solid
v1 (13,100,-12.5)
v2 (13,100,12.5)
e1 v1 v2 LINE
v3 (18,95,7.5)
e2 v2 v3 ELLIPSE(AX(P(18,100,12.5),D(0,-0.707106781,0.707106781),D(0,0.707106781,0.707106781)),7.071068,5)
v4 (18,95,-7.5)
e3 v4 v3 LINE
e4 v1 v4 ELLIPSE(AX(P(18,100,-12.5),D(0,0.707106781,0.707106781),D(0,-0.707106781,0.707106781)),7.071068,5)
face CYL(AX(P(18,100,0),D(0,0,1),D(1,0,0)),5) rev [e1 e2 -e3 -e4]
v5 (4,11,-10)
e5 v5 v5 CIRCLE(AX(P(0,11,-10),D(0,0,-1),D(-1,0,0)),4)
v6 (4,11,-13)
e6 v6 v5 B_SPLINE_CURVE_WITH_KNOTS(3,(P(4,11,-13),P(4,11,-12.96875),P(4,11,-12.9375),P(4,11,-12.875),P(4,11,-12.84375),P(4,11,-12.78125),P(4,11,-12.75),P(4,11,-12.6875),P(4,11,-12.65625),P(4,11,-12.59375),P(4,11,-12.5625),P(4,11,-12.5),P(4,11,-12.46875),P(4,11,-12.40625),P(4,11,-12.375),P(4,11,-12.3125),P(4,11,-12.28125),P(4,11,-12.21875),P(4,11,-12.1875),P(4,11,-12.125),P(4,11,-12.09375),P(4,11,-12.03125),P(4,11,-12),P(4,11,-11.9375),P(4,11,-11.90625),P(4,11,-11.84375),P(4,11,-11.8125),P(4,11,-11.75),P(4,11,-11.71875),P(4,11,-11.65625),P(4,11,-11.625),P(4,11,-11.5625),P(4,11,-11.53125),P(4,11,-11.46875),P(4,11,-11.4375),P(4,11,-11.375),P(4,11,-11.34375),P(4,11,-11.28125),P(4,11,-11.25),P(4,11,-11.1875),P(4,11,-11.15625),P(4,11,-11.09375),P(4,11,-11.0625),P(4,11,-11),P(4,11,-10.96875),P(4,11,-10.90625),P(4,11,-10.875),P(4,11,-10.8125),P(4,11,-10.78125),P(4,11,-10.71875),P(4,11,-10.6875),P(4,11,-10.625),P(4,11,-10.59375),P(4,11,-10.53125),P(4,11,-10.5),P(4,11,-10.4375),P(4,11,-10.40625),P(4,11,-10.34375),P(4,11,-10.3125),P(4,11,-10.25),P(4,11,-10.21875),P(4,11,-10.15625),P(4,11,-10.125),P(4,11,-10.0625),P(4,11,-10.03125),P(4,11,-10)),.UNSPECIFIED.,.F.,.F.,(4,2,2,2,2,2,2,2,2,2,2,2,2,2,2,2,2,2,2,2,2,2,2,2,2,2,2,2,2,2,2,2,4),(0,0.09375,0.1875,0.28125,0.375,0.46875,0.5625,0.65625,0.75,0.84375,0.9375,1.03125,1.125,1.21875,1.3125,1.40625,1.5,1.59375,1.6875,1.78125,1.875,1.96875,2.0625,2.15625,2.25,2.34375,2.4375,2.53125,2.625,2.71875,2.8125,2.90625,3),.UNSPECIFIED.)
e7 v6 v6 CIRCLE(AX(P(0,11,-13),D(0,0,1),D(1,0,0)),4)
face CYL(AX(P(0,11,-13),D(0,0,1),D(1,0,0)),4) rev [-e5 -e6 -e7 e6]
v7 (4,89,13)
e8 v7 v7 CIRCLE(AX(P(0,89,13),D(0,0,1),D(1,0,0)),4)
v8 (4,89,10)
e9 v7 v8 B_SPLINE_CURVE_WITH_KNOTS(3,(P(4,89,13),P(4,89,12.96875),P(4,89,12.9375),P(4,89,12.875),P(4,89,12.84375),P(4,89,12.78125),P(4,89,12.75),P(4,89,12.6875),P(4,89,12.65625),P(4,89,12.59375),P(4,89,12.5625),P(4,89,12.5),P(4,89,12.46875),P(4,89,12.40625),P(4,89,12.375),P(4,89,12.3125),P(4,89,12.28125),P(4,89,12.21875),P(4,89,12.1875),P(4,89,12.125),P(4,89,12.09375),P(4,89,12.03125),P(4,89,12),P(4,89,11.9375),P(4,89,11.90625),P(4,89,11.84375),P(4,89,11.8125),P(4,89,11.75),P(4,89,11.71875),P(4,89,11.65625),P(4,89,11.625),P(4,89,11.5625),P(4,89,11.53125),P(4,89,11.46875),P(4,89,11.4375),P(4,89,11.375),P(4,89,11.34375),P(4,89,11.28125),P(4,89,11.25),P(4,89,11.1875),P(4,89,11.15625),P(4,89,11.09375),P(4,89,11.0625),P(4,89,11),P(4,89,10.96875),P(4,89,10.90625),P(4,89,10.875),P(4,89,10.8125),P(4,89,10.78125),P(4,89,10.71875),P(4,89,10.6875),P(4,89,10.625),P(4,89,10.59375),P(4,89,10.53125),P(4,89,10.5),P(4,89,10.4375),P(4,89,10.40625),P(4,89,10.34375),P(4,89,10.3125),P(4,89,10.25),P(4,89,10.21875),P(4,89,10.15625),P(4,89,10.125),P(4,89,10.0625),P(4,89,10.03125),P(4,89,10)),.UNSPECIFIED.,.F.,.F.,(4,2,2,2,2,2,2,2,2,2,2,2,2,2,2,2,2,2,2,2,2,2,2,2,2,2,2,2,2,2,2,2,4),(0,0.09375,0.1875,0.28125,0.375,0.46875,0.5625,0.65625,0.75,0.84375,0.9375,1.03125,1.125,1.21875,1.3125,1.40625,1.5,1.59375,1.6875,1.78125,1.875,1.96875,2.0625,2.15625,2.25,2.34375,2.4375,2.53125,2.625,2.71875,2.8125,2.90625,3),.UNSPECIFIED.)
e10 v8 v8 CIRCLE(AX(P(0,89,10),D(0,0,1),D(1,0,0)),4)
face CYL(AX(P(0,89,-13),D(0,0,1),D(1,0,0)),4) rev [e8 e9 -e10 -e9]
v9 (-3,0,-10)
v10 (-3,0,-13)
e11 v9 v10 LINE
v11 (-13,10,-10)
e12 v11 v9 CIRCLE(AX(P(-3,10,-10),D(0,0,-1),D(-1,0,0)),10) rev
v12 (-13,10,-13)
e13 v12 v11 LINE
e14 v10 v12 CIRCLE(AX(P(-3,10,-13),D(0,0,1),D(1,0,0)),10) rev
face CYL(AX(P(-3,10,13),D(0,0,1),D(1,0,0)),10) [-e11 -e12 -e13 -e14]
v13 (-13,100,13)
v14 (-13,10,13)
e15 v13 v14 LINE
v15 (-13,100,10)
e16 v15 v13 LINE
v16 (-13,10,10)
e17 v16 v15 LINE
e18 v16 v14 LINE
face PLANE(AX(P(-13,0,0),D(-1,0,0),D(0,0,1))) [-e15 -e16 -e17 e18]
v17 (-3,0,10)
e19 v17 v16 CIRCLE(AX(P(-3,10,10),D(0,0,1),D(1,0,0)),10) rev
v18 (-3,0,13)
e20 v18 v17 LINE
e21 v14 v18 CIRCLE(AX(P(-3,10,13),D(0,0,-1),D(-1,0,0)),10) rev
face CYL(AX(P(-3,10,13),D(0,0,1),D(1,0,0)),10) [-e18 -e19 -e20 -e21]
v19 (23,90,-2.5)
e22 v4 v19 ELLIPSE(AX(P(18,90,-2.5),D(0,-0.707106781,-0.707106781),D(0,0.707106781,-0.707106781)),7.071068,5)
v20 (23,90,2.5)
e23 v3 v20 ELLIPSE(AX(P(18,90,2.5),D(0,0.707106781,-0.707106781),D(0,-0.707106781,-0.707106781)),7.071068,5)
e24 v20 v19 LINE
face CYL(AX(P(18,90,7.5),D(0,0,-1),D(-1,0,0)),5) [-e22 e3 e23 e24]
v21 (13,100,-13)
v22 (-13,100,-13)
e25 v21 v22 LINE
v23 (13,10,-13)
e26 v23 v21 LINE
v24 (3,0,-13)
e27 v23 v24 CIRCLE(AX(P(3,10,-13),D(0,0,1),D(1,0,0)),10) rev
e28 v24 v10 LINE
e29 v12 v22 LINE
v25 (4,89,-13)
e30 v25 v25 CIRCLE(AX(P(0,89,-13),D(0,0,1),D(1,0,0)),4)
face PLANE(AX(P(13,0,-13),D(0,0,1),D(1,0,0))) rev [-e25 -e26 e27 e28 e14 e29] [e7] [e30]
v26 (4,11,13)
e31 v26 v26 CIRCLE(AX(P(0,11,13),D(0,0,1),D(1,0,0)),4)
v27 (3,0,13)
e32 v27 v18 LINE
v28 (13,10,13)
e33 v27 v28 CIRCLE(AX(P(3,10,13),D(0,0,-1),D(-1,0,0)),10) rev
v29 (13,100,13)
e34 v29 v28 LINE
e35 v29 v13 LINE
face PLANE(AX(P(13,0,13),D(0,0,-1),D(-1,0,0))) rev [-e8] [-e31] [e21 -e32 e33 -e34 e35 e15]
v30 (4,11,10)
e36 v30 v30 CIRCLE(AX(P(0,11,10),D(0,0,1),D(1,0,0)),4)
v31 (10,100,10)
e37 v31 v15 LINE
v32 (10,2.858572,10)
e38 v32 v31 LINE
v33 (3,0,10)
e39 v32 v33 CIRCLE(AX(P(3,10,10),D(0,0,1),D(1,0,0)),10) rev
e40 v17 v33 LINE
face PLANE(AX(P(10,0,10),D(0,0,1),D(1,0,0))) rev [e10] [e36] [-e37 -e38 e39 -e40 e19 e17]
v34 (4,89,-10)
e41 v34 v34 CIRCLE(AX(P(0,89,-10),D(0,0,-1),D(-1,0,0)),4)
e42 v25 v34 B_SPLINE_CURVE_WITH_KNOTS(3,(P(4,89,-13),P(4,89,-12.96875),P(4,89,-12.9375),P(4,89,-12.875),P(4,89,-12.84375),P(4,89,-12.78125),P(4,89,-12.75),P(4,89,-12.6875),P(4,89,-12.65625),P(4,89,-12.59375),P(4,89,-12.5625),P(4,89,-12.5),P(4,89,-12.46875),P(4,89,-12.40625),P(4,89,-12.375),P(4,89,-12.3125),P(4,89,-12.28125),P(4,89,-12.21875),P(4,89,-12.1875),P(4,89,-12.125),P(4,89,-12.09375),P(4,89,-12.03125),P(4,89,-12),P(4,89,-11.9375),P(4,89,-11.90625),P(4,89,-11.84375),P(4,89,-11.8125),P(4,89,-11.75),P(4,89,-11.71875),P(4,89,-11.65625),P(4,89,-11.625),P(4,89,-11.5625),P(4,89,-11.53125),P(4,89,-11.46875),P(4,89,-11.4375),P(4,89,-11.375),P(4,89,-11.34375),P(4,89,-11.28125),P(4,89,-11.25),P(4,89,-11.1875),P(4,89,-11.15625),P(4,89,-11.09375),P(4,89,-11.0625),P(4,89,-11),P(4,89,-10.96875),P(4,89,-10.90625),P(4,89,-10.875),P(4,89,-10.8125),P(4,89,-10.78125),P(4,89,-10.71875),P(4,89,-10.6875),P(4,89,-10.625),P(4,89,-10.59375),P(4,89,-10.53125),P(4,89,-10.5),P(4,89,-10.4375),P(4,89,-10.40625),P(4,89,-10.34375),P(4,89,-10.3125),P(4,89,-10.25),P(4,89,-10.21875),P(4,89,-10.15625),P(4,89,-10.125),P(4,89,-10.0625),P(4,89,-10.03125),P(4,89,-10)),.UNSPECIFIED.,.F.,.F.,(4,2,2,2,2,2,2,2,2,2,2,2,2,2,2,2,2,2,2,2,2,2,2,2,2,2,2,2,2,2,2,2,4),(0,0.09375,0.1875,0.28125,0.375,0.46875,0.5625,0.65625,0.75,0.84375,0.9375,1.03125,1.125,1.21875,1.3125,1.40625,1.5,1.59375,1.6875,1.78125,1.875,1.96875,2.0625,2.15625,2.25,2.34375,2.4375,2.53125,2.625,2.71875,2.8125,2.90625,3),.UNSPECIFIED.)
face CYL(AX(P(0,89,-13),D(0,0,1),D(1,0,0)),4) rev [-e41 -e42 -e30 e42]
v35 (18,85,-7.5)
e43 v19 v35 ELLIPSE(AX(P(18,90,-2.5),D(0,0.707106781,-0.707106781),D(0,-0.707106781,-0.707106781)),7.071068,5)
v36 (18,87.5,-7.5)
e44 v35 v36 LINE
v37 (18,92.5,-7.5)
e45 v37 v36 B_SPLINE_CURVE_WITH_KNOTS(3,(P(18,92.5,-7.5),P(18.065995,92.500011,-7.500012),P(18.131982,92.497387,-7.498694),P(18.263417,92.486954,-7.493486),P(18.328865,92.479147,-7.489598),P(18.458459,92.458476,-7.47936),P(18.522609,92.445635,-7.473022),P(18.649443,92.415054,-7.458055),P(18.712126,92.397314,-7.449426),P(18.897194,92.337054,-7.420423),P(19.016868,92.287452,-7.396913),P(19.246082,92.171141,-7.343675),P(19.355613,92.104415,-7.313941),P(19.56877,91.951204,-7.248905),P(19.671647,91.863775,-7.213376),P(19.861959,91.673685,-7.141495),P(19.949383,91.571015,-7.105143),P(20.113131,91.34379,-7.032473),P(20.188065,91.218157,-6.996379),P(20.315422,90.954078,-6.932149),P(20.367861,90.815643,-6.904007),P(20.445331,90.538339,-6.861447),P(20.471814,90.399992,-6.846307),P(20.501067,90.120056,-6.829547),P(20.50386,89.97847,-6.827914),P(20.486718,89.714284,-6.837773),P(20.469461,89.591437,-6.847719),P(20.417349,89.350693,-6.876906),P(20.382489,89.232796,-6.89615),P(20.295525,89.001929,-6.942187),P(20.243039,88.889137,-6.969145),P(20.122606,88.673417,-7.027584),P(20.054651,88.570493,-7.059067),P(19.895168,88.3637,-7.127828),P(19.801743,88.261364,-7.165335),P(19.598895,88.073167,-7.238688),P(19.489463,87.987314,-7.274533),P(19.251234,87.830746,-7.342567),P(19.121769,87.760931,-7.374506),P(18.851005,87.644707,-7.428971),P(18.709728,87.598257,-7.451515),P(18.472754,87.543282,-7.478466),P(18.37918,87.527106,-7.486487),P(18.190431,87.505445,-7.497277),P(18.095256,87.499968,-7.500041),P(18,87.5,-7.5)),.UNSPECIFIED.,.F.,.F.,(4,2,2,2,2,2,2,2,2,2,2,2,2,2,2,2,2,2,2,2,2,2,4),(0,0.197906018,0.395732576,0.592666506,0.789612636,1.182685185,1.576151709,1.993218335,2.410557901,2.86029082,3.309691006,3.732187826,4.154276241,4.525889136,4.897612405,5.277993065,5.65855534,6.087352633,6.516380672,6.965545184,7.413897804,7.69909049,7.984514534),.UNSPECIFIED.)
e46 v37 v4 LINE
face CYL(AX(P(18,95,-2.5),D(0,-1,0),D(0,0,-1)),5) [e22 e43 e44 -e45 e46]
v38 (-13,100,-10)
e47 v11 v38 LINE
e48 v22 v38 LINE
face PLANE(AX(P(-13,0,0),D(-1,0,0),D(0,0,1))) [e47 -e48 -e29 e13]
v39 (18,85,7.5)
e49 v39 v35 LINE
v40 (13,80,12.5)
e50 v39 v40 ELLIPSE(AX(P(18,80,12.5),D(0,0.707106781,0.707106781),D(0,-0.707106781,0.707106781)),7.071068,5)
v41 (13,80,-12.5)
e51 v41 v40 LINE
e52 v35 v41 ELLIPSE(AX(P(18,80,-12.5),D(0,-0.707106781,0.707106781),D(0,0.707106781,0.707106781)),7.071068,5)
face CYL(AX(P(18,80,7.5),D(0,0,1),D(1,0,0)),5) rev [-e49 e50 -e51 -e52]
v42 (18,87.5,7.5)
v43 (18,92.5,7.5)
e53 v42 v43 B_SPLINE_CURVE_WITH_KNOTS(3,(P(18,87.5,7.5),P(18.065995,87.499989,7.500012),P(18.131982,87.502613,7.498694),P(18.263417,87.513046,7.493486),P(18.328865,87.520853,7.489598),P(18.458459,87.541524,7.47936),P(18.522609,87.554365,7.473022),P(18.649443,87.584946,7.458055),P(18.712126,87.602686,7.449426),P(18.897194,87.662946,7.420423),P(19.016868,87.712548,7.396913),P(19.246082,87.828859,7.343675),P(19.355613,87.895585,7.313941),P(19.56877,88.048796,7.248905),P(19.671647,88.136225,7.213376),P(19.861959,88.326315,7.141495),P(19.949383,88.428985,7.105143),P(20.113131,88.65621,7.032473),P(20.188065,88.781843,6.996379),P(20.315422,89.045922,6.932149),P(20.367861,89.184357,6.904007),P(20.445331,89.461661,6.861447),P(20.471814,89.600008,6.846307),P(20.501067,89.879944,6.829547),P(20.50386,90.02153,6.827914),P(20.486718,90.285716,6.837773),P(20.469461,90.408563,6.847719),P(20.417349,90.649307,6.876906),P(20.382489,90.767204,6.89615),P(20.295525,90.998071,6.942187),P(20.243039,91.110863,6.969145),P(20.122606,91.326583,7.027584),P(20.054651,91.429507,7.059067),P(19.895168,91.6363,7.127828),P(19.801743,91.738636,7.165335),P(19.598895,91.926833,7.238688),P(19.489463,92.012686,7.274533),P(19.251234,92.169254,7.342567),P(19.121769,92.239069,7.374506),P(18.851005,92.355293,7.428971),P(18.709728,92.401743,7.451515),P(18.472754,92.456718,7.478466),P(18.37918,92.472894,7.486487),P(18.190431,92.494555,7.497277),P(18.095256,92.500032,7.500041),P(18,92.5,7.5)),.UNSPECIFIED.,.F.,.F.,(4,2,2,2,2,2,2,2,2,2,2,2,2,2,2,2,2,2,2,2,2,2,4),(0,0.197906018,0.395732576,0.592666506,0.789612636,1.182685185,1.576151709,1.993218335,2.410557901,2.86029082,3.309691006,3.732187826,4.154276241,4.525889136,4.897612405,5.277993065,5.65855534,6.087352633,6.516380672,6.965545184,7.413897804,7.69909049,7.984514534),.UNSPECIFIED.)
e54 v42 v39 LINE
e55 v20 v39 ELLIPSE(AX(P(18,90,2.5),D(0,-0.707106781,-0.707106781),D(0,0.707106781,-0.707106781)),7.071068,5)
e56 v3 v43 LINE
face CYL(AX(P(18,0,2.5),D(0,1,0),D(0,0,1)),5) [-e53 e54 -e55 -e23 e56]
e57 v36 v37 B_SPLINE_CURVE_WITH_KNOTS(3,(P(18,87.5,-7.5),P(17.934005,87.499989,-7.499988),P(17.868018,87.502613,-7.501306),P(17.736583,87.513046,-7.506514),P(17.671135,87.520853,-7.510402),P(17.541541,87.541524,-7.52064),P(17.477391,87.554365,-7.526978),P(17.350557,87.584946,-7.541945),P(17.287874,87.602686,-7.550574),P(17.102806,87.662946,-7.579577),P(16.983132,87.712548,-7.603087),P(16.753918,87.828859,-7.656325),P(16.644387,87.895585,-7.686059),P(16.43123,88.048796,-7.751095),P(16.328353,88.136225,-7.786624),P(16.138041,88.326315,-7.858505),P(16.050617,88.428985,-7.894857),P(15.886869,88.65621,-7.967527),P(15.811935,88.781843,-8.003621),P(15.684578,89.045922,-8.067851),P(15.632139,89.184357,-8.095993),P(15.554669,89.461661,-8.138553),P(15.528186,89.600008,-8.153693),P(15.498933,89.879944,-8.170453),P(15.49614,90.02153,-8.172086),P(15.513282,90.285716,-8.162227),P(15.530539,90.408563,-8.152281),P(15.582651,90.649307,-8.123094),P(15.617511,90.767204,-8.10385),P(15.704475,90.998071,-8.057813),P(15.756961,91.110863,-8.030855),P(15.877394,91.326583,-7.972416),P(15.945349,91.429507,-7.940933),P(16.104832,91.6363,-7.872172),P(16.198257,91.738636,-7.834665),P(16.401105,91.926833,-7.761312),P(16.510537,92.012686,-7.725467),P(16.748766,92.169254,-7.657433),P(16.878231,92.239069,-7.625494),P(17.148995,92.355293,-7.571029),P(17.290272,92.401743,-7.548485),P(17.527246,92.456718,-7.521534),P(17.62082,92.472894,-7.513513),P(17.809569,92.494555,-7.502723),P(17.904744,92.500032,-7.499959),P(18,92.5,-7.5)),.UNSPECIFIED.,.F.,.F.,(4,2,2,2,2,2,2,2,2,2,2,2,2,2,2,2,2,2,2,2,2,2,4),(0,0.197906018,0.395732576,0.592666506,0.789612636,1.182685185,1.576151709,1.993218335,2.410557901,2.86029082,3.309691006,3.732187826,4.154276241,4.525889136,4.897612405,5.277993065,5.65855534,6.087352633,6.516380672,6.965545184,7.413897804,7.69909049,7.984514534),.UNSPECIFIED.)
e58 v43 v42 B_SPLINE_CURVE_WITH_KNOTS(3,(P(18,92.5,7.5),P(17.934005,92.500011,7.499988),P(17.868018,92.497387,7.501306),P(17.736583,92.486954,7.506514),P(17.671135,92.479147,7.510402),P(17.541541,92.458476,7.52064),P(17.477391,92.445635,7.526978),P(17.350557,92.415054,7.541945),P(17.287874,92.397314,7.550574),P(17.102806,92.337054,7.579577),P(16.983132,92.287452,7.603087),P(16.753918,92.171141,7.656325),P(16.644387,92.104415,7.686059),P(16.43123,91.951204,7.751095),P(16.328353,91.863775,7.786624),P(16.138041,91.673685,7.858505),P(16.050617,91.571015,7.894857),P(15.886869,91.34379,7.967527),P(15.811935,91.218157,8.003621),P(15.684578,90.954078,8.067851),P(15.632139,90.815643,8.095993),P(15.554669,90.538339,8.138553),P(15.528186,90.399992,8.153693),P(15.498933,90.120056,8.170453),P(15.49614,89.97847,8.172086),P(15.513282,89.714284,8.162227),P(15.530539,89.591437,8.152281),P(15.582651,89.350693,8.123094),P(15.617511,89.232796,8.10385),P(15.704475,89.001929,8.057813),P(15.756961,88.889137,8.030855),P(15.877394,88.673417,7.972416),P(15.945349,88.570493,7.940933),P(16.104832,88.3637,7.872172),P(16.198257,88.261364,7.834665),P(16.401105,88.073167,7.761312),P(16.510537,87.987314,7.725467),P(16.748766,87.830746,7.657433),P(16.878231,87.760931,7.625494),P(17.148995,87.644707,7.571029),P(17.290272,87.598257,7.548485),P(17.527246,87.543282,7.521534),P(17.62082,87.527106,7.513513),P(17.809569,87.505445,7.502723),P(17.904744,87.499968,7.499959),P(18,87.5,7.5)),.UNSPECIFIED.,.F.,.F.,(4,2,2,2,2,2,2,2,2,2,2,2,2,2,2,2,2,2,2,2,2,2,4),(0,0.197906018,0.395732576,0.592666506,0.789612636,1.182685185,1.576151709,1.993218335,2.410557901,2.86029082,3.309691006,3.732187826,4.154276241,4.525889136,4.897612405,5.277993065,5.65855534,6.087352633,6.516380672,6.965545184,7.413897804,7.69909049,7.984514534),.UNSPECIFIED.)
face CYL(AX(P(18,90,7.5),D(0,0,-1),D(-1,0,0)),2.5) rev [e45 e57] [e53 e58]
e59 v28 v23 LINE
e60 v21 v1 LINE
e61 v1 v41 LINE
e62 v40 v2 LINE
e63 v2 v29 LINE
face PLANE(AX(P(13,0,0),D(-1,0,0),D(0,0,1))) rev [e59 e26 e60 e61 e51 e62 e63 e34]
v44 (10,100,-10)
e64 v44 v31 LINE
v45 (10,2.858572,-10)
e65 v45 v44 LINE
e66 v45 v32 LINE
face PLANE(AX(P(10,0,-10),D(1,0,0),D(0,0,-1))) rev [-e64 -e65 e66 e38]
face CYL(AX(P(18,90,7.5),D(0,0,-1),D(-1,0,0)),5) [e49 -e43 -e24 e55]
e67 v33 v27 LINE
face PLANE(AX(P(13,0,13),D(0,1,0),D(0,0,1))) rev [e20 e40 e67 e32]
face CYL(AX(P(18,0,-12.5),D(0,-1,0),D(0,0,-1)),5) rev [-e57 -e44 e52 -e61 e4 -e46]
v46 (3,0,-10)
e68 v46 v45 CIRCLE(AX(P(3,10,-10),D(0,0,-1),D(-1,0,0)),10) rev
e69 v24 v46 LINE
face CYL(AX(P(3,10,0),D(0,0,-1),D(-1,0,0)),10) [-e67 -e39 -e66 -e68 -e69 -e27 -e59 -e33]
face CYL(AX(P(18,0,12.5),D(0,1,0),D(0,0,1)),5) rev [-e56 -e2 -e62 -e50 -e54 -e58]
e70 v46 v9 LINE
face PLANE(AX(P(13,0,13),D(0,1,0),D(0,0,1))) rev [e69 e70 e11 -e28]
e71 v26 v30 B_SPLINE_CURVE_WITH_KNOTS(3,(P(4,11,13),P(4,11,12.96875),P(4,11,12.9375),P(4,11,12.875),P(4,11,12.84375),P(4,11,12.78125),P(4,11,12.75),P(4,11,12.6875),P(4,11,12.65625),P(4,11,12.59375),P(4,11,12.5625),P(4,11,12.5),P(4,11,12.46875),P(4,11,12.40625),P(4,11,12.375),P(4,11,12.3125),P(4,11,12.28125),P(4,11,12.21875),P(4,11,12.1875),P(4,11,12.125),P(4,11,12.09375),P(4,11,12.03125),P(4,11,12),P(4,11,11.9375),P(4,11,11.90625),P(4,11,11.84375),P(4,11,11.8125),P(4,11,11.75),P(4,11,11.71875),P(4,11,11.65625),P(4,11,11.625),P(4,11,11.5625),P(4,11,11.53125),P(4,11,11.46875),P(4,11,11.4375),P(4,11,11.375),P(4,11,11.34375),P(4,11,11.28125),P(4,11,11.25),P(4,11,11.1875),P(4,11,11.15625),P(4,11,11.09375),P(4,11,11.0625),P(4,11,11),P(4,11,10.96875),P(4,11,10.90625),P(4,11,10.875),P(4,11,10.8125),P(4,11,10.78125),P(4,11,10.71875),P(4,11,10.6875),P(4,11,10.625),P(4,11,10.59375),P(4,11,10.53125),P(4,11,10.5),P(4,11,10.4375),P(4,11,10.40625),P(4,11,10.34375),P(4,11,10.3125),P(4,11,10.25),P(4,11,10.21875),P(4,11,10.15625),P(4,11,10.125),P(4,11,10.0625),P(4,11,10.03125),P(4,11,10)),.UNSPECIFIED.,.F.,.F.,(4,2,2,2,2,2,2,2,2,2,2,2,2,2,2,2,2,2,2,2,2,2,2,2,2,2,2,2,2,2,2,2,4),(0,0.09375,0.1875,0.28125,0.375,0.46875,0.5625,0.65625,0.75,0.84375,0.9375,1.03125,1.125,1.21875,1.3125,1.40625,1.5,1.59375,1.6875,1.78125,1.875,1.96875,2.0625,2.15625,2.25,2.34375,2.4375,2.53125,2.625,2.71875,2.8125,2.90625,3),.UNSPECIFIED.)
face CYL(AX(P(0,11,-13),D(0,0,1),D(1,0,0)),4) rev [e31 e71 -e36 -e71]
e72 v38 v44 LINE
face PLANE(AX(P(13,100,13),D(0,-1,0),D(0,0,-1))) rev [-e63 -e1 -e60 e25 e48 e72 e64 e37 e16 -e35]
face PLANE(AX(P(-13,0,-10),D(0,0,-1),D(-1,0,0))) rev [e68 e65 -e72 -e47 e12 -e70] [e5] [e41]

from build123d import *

# Parameters (mm, degrees)
SKETCH1_W               = 26
SKETCH1_H               = 100
BOSS_EXTRUDE1_DEPTH     = 13
FILLET1_R               = 10
SKETCH5_W               = 10
SKETCH5_H               = 10
SKETCH5_R               = 2.5
BOSS_EXTRUDE3_DEPTH     = 7.5
FILLET2_R               = 5
CUT_EXTRUDE1_DEPTH      = 104.431136533
CUT_EXTRUDE1_DEPTH_BACK = 104.431136533
SKETCH6_W               = 23
SKETCH6_H               = 20
CUT_EXTRUDE2_DEPTH      = 104.43113663
CUT_EXTRUDE2_DEPTH_BACK = 104.43113663
SKETCH3_R               = 4


with BuildPart() as part:
    # Sketch1 → Boss-Extrude1 (new, symmetric)
    with BuildSketch(Plane(origin=(0, 0, 0), x_dir=(0, 0, -1), z_dir=(1, 0, 0))):
        with Locations((0, 50)):
            Rectangle(SKETCH1_W, SKETCH1_H)
    extrude(amount=BOSS_EXTRUDE1_DEPTH, both=True)

    # Fillet1
    fillet1_edges = [part.edges().sort_by_distance(p)[0] for p in [
        (-13, 0, 0),
        (13, 0, 0),
    ]]
    fillet(fillet1_edges, radius=FILLET1_R)

    # Sketch5 → Boss-Extrude3 (add, symmetric)
    with BuildSketch(Plane.XY):
        with Locations((18, 90)):
            Rectangle(SKETCH5_W, SKETCH5_H)
        with Locations((18, 90)):
            Circle(SKETCH5_R, mode=Mode.SUBTRACT)
    extrude(amount=BOSS_EXTRUDE3_DEPTH, both=True)

    # Fillet2
    # the kernel refuses this fillet: 5 mm, written as the material it adds along each edge
    with BuildSketch(Plane(origin=(13, 85, 7.5), x_dir=(0, 0, 1), z_dir=(0, 1, 0))) as fillet2_piece_1_section:
        with BuildLine():
            CenterArc((FILLET2_R, FILLET2_R), FILLET2_R, 180, 90)
            Line((0, FILLET2_R), (0, 0))
            Line((0, 0), (FILLET2_R, 0))
        make_face()
    fillet2_piece_1 = extrude(amount=10, mode=Mode.PRIVATE)
    fillet2_piece_1 = fillet2_piece_1 - Plane(origin=(18, 90, 8.676026407), x_dir=(1, 0, 0), z_dir=(0, 0, -1)) * Cylinder(2.5, 41, mode=Mode.PRIVATE)
    add(fillet2_piece_1)
    with BuildSketch(Plane(origin=(13, 85, -7.5), x_dir=(0, 0, -1), z_dir=(0, 1, 0))) as fillet2_piece_2_section:
        with BuildLine():
            CenterArc((FILLET2_R, -FILLET2_R), FILLET2_R, 90, 90)
            Line((0, -FILLET2_R), (0, 0))
            Line((0, 0), (FILLET2_R, 0))
        make_face()
    fillet2_piece_2 = extrude(amount=10, mode=Mode.PRIVATE)
    fillet2_piece_2 = fillet2_piece_2 - Plane(origin=(18, 90, -8.676026407), x_dir=(1, 0, 0), z_dir=(0, 0, -1)) * Cylinder(2.5, 41, mode=Mode.PRIVATE)
    add(fillet2_piece_2)
    with BuildSketch(Plane(origin=(13, 95, -7.5), x_dir=(0, 1, 0), z_dir=(0, 0, 1))) as fillet2_piece_3:
        with BuildLine():
            CenterArc((FILLET2_R, -FILLET2_R), FILLET2_R, 90, 90)
            Line((0, -FILLET2_R), (0, 0))
            Line((0, 0), (FILLET2_R, 0))
        make_face()
    extrude(amount=15)
    with BuildSketch(Plane(origin=(13, 85, -7.5), x_dir=(0, -1, 0), z_dir=(0, 0, 1))) as fillet2_piece_4:
        with BuildLine():
            CenterArc((FILLET2_R, FILLET2_R), FILLET2_R, 180, 90)
            Line((0, FILLET2_R), (0, 0))
            Line((0, 0), (FILLET2_R, 0))
        make_face()
    extrude(amount=15)
    with BuildSketch(Plane(origin=(13, 72.5, 7.5), x_dir=(0, 0, 1), z_dir=(0, 1, 0))) as fillet2_piece_5a_section:
        with BuildLine():
            CenterArc((FILLET2_R, FILLET2_R), FILLET2_R, 180, 90)
            Line((0, FILLET2_R), (0, 0))
            Line((0, 0), (FILLET2_R, 0))
        make_face()
    fillet2_piece_5a = extrude(amount=22.5, mode=Mode.PRIVATE)
    fillet2_piece_5a = split(fillet2_piece_5a, bisect_by=Plane(origin=(14.131975571, 85, 8.631975571), z_dir=(0, -1, 0)), keep=Keep.TOP, mode=Mode.PRIVATE)
    with BuildSketch(Plane(origin=(13, 85, -7.5), x_dir=(0, -1, 0), z_dir=(0, 0, 1))) as fillet2_piece_5b_section:
        with BuildLine():
            CenterArc((FILLET2_R, FILLET2_R), FILLET2_R, 180, 90)
            Line((0, FILLET2_R), (0, 0))
            Line((0, 0), (FILLET2_R, 0))
        make_face()
    fillet2_piece_5b = extrude(amount=27.5, mode=Mode.PRIVATE)
    fillet2_piece_5b = split(fillet2_piece_5b, bisect_by=Plane(origin=(14.131975571, 83.868024429, 13), z_dir=(0, 0, -1)), keep=Keep.TOP, mode=Mode.PRIVATE)
    fillet2_piece_5b = split(fillet2_piece_5b, bisect_by=Plane(origin=(14.131975571, 83.868024429, 7.5), z_dir=(0, 0, 1)), keep=Keep.TOP, mode=Mode.PRIVATE)
    fillet2_piece_5 = fillet2_piece_5a & fillet2_piece_5b
    add(fillet2_piece_5)
    with BuildSketch(Plane(origin=(13, 95, -7.5), x_dir=(0, 1, 0), z_dir=(0, 0, 1))) as fillet2_piece_6a_section:
        with BuildLine():
            CenterArc((FILLET2_R, -FILLET2_R), FILLET2_R, 90, 90)
            Line((0, -FILLET2_R), (0, 0))
            Line((0, 0), (FILLET2_R, 0))
        make_face()
    fillet2_piece_6a = extrude(amount=27.5, mode=Mode.PRIVATE)
    fillet2_piece_6a = split(fillet2_piece_6a, bisect_by=Plane(origin=(14.131975571, 96.131975571, 13), z_dir=(0, 0, -1)), keep=Keep.TOP, mode=Mode.PRIVATE)
    fillet2_piece_6a = split(fillet2_piece_6a, bisect_by=Plane(origin=(14.131975571, 96.131975571, 7.5), z_dir=(0, 0, 1)), keep=Keep.TOP, mode=Mode.PRIVATE)
    with BuildSketch(Plane(origin=(13, 85, 7.5), x_dir=(0, 0, 1), z_dir=(0, 1, 0))) as fillet2_piece_6b_section:
        with BuildLine():
            CenterArc((FILLET2_R, FILLET2_R), FILLET2_R, 180, 90)
            Line((0, FILLET2_R), (0, 0))
            Line((0, 0), (FILLET2_R, 0))
        make_face()
    fillet2_piece_6b = extrude(amount=22.5, mode=Mode.PRIVATE)
    fillet2_piece_6b = split(fillet2_piece_6b, bisect_by=Plane(origin=(14.131975571, 100, 8.631975571), z_dir=(0, -1, 0)), keep=Keep.TOP, mode=Mode.PRIVATE)
    fillet2_piece_6b = split(fillet2_piece_6b, bisect_by=Plane(origin=(14.131975571, 95, 8.631975571), z_dir=(0, 1, 0)), keep=Keep.TOP, mode=Mode.PRIVATE)
    fillet2_piece_6 = fillet2_piece_6a & fillet2_piece_6b
    add(fillet2_piece_6)
    with BuildSketch(Plane(origin=(13, 85, -20), x_dir=(0, -1, 0), z_dir=(0, 0, 1))) as fillet2_piece_7a_section:
        with BuildLine():
            CenterArc((FILLET2_R, FILLET2_R), FILLET2_R, 180, 90)
            Line((0, FILLET2_R), (0, 0))
            Line((0, 0), (FILLET2_R, 0))
        make_face()
    fillet2_piece_7a = extrude(amount=27.5, mode=Mode.PRIVATE)
    fillet2_piece_7a = split(fillet2_piece_7a, bisect_by=Plane(origin=(14.131975571, 83.868024429, -13), z_dir=(0, 0, 1)), keep=Keep.TOP, mode=Mode.PRIVATE)
    fillet2_piece_7a = split(fillet2_piece_7a, bisect_by=Plane(origin=(14.131975571, 83.868024429, -7.5), z_dir=(0, 0, -1)), keep=Keep.TOP, mode=Mode.PRIVATE)
    with BuildSketch(Plane(origin=(13, 72.5, -7.5), x_dir=(0, 0, -1), z_dir=(0, 1, 0))) as fillet2_piece_7b_section:
        with BuildLine():
            CenterArc((FILLET2_R, -FILLET2_R), FILLET2_R, 90, 90)
            Line((0, -FILLET2_R), (0, 0))
            Line((0, 0), (FILLET2_R, 0))
        make_face()
    fillet2_piece_7b = extrude(amount=22.5, mode=Mode.PRIVATE)
    fillet2_piece_7b = split(fillet2_piece_7b, bisect_by=Plane(origin=(14.131975571, 85, -8.631975571), z_dir=(0, -1, 0)), keep=Keep.TOP, mode=Mode.PRIVATE)
    fillet2_piece_7 = fillet2_piece_7a & fillet2_piece_7b
    add(fillet2_piece_7)
    with BuildSketch(Plane(origin=(13, 95, -20), x_dir=(0, 1, 0), z_dir=(0, 0, 1))) as fillet2_piece_8a_section:
        with BuildLine():
            CenterArc((FILLET2_R, -FILLET2_R), FILLET2_R, 90, 90)
            Line((0, -FILLET2_R), (0, 0))
            Line((0, 0), (FILLET2_R, 0))
        make_face()
    fillet2_piece_8a = extrude(amount=27.5, mode=Mode.PRIVATE)
    fillet2_piece_8a = split(fillet2_piece_8a, bisect_by=Plane(origin=(14.131975571, 96.131975571, -13), z_dir=(0, 0, 1)), keep=Keep.TOP, mode=Mode.PRIVATE)
    fillet2_piece_8a = split(fillet2_piece_8a, bisect_by=Plane(origin=(14.131975571, 96.131975571, -7.5), z_dir=(0, 0, -1)), keep=Keep.TOP, mode=Mode.PRIVATE)
    with BuildSketch(Plane(origin=(13, 85, -7.5), x_dir=(0, 0, -1), z_dir=(0, 1, 0))) as fillet2_piece_8b_section:
        with BuildLine():
            CenterArc((FILLET2_R, -FILLET2_R), FILLET2_R, 90, 90)
            Line((0, -FILLET2_R), (0, 0))
            Line((0, 0), (FILLET2_R, 0))
        make_face()
    fillet2_piece_8b = extrude(amount=22.5, mode=Mode.PRIVATE)
    fillet2_piece_8b = split(fillet2_piece_8b, bisect_by=Plane(origin=(14.131975571, 100, -8.631975571), z_dir=(0, -1, 0)), keep=Keep.TOP, mode=Mode.PRIVATE)
    fillet2_piece_8b = split(fillet2_piece_8b, bisect_by=Plane(origin=(14.131975571, 95, -8.631975571), z_dir=(0, 1, 0)), keep=Keep.TOP, mode=Mode.PRIVATE)
    fillet2_piece_8 = fillet2_piece_8a & fillet2_piece_8b
    add(fillet2_piece_8)
    # the kernel refuses this fillet: 5 mm, written as the material it takes off along each edge
    with BuildSketch(Plane(origin=(23, 107.5, -7.5), x_dir=(-1, 0, 0), z_dir=(0, -1, 0)), Plane(origin=(23, 107.5, 7.5), x_dir=(0, 0, -1), z_dir=(0, -1, 0))) as fillet2_2_piece_1:
        with BuildLine():
            CenterArc((FILLET2_R, -FILLET2_R), FILLET2_R, 90, 90)
            Line((0, -FILLET2_R), (0, 0))
            Line((0, 0), (FILLET2_R, 0))
        make_face()
    extrude(amount=35, mode=Mode.SUBTRACT)
    with BuildSketch(Plane(origin=(23, 95, 20), x_dir=(-1, 0, 0), z_dir=(0, 0, -1)), Plane(origin=(23, 85, 20), x_dir=(0, 1, 0), z_dir=(0, 0, -1))) as fillet2_2_piece_2:
        with BuildLine():
            CenterArc((FILLET2_R, -FILLET2_R), FILLET2_R, 90, 90)
            Line((0, -FILLET2_R), (0, 0))
            Line((0, 0), (FILLET2_R, 0))
        make_face()
    extrude(amount=40, mode=Mode.SUBTRACT)

    # Sketch6 → Cut-Extrude1 (cut, two sides: drawn at the far end of the back side and taken through both)
    with BuildSketch(Plane(origin=(0, 100, 0), x_dir=(1, 0, 0), z_dir=(0, 1, 0)).offset(-CUT_EXTRUDE1_DEPTH_BACK)):
        with Locations((-1.5, 0)):
            Rectangle(SKETCH6_W, SKETCH6_H)
    extrude(amount=CUT_EXTRUDE1_DEPTH + CUT_EXTRUDE1_DEPTH_BACK, mode=Mode.SUBTRACT)

    # Sketch3 → Cut-Extrude2 (cut, two sides: drawn at the far end of the back side and taken through both)
    with BuildSketch(Plane.XY.offset(-CUT_EXTRUDE2_DEPTH_BACK)):
        with Locations((0, 11)):
            Circle(SKETCH3_R)
        with Locations((0, 89)):
            Circle(SKETCH3_R)
    extrude(amount=CUT_EXTRUDE2_DEPTH + CUT_EXTRUDE2_DEPTH_BACK, mode=Mode.SUBTRACT)


solid = part.part
